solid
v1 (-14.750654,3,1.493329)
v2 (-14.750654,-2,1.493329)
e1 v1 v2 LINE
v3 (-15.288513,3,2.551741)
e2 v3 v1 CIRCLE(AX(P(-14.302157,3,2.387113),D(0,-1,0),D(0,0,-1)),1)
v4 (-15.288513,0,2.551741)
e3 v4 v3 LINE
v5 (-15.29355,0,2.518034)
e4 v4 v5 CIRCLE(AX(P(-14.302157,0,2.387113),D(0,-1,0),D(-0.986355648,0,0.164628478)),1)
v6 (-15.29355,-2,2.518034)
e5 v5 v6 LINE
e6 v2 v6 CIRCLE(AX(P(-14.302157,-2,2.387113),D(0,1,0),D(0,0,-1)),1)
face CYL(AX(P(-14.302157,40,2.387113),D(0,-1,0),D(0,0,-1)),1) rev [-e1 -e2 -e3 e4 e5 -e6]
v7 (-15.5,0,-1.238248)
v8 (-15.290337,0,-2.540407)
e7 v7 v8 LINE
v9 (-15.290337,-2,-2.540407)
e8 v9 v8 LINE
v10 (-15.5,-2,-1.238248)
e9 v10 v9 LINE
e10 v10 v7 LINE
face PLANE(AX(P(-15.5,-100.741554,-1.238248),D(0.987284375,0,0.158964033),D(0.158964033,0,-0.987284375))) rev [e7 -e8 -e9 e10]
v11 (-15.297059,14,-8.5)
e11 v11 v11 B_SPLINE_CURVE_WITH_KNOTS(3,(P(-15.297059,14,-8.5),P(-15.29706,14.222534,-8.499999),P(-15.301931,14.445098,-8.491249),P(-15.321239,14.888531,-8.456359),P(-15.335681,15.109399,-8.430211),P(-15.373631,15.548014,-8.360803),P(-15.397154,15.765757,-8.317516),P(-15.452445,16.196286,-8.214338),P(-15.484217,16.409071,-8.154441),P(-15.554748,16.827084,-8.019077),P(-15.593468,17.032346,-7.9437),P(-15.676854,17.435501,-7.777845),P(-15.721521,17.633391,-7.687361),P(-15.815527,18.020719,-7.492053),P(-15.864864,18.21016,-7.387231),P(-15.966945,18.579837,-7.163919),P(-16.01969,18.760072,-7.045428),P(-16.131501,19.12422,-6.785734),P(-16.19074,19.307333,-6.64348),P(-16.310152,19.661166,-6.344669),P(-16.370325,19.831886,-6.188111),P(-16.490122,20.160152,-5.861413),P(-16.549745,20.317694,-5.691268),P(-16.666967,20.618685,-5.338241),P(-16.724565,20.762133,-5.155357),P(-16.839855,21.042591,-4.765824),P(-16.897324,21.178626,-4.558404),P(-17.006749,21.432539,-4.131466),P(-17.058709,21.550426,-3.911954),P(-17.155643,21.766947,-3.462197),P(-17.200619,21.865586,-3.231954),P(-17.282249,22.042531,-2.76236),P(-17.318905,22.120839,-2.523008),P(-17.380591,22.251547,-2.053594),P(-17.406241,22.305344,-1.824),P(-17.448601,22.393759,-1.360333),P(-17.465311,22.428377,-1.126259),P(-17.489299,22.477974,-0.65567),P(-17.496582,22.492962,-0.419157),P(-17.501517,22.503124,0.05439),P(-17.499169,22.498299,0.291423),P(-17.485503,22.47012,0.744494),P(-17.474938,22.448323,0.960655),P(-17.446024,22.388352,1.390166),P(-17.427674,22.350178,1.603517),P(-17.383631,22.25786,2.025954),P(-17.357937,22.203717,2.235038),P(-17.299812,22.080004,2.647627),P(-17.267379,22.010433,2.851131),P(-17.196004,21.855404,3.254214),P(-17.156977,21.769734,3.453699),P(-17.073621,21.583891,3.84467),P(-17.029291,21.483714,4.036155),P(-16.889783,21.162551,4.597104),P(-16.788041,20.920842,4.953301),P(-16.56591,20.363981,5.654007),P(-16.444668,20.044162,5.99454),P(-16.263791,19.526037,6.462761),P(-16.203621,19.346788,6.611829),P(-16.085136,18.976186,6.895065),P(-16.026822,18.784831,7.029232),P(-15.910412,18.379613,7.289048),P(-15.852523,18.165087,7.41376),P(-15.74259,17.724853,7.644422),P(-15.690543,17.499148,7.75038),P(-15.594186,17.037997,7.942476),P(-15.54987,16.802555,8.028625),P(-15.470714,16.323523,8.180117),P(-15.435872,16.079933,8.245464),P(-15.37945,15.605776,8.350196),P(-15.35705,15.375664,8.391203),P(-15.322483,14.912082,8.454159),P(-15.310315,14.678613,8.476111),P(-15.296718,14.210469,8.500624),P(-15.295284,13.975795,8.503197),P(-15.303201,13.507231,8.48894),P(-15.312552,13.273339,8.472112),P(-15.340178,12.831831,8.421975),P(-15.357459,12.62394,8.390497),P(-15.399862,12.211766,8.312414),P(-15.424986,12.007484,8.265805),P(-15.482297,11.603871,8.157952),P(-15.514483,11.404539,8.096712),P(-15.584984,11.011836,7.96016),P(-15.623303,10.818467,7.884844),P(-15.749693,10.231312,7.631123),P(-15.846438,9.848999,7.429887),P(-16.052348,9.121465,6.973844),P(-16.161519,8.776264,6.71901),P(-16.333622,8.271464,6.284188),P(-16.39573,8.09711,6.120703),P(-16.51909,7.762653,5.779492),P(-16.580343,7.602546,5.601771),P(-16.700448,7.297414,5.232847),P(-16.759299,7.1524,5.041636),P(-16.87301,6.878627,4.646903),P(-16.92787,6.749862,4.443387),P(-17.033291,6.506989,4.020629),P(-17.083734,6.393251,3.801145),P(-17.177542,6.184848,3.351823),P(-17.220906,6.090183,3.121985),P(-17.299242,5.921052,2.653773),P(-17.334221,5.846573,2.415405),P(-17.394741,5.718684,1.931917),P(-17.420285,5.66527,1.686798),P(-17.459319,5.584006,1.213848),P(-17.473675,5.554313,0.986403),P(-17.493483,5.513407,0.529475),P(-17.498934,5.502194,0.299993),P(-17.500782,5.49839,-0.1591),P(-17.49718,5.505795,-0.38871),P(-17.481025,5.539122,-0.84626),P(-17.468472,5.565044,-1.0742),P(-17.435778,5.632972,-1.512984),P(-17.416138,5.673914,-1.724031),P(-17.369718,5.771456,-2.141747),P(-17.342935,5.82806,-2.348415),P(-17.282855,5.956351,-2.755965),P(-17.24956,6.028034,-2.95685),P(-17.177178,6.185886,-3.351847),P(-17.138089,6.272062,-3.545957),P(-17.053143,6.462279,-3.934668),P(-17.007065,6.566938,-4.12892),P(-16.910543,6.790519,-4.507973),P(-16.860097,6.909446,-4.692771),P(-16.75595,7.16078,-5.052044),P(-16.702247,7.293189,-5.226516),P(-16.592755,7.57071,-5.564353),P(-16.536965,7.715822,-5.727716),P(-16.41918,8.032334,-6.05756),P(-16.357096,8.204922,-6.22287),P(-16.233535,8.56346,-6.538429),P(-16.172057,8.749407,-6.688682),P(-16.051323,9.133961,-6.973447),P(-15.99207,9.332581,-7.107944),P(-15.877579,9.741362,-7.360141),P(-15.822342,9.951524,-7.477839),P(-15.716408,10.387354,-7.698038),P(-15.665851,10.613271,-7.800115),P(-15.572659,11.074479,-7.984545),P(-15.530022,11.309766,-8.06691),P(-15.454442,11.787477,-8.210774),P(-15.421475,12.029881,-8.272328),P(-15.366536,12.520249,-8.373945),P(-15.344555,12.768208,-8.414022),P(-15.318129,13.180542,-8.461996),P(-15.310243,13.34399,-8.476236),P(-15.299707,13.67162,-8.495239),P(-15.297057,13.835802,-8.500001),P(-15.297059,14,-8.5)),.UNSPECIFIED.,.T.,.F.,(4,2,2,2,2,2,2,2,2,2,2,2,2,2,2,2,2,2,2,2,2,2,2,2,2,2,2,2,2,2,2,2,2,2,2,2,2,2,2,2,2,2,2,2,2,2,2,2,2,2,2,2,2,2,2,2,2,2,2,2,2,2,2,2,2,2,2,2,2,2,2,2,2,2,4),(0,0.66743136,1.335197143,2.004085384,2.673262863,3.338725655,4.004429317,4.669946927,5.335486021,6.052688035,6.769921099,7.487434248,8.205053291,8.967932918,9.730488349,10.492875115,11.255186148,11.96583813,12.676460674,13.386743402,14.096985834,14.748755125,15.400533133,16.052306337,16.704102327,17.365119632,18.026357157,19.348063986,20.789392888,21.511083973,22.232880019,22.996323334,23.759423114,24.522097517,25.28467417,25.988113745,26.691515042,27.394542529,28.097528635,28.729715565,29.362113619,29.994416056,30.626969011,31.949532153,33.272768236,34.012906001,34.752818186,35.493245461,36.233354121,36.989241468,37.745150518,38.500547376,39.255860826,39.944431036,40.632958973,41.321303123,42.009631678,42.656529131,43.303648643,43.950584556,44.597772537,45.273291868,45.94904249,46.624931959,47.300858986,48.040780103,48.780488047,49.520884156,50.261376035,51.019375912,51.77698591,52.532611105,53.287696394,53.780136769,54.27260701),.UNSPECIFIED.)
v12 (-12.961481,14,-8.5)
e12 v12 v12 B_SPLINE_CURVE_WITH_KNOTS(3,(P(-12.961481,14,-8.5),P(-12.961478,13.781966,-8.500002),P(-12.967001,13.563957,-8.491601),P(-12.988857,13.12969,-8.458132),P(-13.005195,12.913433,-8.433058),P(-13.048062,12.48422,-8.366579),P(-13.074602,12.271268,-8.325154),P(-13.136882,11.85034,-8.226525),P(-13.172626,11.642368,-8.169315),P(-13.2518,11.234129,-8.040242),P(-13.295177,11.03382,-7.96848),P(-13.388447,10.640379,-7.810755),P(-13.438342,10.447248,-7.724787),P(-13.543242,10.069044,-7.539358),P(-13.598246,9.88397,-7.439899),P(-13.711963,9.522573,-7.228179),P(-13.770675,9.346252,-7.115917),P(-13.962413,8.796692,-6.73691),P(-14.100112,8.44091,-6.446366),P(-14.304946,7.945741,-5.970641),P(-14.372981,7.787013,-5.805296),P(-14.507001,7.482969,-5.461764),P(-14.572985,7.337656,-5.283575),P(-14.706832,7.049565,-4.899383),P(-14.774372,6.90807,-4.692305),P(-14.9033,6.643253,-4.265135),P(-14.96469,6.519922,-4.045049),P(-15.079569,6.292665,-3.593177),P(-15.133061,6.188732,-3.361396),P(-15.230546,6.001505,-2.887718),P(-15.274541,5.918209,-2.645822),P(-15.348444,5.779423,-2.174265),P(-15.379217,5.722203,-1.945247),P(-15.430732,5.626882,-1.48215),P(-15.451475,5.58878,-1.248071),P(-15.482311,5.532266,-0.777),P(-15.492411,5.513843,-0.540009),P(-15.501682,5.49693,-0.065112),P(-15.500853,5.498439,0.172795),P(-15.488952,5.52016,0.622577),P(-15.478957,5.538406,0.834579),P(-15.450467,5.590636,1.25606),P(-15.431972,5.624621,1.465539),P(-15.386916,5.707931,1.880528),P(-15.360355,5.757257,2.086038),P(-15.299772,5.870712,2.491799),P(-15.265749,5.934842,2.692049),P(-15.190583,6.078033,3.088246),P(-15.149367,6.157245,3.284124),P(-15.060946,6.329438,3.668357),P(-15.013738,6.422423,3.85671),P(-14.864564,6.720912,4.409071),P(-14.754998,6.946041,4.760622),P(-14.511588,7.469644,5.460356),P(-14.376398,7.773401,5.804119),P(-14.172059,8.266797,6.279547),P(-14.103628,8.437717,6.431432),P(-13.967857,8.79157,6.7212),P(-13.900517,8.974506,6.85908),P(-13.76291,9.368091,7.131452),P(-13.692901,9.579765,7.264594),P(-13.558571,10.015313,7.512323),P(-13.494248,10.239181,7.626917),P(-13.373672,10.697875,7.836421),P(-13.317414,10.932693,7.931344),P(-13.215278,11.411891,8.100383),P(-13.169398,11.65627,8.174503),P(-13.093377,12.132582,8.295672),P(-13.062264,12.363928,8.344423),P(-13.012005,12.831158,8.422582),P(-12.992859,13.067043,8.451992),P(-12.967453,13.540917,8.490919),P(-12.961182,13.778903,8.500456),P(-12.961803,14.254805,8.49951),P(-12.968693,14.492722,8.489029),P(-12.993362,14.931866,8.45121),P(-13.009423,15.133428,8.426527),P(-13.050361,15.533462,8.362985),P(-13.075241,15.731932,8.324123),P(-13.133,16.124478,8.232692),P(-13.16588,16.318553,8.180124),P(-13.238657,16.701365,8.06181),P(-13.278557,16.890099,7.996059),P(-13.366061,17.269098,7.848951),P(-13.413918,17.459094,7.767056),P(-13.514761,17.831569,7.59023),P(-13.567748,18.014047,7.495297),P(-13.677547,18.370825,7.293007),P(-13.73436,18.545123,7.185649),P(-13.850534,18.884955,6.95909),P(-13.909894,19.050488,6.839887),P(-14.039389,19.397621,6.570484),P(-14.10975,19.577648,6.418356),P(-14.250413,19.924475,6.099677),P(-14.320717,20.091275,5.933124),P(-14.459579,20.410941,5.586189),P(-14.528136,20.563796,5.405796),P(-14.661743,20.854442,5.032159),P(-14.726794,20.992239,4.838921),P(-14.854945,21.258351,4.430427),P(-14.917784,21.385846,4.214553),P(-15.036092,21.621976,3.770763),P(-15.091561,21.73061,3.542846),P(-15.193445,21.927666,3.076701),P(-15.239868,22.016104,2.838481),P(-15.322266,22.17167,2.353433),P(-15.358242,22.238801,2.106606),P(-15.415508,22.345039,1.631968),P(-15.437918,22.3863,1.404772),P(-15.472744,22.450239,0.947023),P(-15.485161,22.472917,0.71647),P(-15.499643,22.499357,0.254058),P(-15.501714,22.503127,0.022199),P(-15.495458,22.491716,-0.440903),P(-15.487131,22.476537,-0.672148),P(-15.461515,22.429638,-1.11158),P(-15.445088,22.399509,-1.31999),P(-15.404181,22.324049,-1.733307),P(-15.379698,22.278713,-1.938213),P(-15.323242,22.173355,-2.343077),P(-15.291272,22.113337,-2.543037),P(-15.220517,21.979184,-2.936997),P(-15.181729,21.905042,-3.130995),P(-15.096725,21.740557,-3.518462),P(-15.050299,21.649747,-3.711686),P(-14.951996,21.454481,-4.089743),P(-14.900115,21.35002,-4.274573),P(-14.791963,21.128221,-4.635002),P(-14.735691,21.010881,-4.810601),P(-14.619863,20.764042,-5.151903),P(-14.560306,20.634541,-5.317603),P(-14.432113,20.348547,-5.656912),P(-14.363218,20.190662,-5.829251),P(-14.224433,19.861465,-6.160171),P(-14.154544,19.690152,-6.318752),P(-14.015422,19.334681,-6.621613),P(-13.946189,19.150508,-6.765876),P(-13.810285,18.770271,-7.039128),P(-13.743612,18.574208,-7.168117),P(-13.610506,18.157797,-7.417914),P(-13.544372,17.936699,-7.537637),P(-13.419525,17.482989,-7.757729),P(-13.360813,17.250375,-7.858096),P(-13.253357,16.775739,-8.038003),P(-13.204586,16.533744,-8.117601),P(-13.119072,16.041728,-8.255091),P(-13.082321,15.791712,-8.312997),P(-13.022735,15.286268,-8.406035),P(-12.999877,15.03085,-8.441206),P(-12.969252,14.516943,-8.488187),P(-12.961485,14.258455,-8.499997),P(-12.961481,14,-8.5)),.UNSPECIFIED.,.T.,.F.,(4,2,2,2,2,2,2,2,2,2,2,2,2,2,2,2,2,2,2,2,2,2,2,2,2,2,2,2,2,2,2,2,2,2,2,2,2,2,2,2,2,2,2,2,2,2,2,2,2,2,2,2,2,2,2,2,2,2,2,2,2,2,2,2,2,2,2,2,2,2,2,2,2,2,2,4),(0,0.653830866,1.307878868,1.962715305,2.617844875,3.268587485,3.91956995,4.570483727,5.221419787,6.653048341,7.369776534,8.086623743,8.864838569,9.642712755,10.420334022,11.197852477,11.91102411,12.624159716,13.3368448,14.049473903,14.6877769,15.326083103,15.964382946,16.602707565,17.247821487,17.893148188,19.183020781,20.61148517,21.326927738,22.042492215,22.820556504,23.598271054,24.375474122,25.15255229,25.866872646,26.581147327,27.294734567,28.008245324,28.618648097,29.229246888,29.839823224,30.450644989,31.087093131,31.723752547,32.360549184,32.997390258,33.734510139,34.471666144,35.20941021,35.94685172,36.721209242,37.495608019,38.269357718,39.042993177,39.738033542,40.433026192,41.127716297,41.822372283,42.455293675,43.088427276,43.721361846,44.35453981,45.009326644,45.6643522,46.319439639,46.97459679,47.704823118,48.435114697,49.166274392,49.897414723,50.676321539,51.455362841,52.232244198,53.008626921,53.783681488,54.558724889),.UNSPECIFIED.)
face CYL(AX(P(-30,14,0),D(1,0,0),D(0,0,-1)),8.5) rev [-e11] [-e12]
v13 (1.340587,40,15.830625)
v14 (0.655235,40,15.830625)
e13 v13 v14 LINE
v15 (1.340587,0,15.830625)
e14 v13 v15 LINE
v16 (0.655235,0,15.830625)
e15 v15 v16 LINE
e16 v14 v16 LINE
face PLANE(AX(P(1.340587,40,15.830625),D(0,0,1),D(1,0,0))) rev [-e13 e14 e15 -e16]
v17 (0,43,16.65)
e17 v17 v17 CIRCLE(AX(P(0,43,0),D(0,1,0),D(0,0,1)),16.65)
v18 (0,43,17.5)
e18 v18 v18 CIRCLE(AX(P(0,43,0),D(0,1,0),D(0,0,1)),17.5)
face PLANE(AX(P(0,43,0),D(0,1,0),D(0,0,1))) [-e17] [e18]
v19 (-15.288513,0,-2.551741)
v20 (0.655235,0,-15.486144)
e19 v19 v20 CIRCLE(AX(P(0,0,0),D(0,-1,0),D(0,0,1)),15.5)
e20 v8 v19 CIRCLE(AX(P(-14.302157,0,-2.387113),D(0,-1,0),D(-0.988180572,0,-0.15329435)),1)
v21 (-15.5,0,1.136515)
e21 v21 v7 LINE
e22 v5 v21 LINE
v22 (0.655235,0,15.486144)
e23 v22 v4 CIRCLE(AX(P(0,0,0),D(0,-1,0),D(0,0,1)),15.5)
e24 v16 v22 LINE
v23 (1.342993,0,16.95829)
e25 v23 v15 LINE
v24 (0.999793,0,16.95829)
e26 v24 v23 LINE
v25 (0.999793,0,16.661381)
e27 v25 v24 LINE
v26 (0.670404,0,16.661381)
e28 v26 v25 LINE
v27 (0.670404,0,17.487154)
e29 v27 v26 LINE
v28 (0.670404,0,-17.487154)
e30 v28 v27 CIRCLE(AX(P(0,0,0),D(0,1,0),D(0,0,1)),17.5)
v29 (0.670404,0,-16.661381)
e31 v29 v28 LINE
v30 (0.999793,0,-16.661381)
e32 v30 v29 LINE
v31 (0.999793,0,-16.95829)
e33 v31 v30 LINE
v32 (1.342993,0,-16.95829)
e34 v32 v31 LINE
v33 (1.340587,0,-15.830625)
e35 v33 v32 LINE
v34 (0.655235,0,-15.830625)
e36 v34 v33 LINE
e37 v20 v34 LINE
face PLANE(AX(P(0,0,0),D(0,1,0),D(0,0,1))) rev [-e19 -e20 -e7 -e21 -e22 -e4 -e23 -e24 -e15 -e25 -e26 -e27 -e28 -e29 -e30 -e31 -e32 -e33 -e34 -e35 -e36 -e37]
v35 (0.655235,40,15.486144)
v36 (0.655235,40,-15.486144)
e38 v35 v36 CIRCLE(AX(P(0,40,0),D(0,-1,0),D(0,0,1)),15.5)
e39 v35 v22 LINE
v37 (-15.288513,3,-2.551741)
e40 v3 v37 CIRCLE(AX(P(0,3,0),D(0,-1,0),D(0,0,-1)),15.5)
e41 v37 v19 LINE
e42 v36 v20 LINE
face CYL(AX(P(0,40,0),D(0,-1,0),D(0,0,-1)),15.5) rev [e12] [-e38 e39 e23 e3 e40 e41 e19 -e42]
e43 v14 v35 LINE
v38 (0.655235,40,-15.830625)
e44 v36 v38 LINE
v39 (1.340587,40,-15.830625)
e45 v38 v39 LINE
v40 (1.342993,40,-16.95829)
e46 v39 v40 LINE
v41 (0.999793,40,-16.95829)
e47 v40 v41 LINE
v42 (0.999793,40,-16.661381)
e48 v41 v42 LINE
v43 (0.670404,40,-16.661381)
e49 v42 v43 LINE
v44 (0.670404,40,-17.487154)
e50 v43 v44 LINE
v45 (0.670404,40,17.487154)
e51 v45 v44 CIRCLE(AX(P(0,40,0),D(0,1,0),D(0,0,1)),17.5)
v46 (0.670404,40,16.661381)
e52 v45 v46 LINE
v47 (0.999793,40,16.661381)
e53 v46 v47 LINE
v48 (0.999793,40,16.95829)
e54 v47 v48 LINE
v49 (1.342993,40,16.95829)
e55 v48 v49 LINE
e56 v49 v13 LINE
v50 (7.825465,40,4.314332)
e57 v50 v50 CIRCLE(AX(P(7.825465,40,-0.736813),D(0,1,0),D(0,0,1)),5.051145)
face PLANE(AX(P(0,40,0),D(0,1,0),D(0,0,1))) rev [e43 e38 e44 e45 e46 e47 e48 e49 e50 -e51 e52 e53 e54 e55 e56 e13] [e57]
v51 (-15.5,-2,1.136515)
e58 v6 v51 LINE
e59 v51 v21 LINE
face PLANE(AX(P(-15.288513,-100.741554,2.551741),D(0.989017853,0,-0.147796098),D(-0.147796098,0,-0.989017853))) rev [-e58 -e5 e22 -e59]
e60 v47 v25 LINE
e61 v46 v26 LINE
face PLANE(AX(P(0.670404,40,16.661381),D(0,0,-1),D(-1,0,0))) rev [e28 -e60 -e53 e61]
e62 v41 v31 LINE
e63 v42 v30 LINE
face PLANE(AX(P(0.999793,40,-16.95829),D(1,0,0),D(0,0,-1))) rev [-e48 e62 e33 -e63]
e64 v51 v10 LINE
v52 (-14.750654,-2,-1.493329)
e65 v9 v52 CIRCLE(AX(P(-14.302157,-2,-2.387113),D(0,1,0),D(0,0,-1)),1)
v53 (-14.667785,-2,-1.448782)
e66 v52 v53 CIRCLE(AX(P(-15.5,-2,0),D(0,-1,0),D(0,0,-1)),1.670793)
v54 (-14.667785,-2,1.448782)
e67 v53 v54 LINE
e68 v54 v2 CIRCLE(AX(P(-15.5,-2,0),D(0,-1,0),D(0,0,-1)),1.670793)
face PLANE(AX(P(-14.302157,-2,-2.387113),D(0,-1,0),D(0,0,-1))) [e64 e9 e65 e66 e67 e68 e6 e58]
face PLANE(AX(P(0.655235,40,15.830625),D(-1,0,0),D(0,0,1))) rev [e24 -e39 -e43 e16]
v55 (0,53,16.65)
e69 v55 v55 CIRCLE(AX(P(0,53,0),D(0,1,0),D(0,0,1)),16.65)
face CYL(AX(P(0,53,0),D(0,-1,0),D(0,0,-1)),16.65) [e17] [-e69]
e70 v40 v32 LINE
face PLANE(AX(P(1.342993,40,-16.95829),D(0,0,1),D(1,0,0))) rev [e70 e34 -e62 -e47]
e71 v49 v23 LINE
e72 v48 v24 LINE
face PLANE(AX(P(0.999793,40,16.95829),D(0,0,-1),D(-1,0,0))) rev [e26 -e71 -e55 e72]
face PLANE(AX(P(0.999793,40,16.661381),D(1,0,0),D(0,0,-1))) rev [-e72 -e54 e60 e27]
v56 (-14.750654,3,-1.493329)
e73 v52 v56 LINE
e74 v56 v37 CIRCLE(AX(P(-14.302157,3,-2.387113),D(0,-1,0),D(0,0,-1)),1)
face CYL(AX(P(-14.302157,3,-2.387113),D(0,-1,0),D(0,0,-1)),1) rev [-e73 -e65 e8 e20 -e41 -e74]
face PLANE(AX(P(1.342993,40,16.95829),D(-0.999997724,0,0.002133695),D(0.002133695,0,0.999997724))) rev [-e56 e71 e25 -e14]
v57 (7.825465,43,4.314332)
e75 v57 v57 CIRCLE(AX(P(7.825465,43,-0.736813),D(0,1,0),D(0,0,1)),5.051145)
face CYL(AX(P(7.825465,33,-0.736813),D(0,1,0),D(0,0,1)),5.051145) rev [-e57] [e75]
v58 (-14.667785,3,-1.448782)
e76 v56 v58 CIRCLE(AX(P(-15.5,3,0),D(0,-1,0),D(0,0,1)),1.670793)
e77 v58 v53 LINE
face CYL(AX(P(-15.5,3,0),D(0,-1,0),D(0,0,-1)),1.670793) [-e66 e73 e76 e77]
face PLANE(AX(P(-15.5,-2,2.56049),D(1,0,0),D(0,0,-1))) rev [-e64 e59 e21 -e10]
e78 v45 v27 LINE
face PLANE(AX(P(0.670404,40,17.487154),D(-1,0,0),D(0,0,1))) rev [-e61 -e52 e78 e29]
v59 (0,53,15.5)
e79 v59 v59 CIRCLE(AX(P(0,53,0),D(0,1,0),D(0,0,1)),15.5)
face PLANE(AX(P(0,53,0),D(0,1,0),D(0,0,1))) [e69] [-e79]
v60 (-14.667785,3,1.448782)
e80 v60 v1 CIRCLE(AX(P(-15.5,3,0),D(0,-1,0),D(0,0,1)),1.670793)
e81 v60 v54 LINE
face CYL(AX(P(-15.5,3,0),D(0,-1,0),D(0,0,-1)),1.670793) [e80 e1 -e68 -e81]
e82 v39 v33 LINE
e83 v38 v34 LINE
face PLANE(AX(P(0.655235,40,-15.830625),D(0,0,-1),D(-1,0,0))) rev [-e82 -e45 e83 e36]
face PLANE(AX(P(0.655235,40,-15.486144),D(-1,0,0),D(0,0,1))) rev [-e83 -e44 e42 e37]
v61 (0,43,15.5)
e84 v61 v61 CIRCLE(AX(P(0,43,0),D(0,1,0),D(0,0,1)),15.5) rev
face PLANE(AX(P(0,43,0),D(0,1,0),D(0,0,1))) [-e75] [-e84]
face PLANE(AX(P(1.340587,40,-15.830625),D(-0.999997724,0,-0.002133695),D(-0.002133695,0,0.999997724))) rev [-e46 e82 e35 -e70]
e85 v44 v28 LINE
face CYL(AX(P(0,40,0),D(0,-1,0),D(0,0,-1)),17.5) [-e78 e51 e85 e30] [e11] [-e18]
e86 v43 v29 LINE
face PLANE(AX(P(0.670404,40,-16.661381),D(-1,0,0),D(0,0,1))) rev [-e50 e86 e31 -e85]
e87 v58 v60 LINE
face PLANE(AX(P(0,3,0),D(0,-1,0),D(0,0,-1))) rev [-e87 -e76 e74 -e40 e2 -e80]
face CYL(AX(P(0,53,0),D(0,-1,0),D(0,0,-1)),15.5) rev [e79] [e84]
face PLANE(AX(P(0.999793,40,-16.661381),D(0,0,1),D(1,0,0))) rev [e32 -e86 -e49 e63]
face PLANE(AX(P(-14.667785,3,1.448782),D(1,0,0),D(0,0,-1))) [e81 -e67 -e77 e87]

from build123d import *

# Parameters (mm, degrees)
BOSS_EXTRUDE1_DEPTH = 40
SKETCH16_R          = 17.5
BOSS_EXTRUDE2_DEPTH = 3
SKETCH17_R          = 16.65
SKETCH17_R_2        = 15.5
BOSS_EXTRUDE3_DEPTH = 10
SKETCH18_R          = 8.5
CUT_EXTRUDE1_DEPTH  = 30
BOSS_EXTRUDE4_DEPTH = 3
FILLET1_R           = 1
FILLET3_R           = 1
BOSS_EXTRUDE5_START = 2
BOSS_EXTRUDE5_DEPTH = 2
CUT_EXTRUDE3_START  = -2
CUT_EXTRUDE3_DEPTH  = 2
SKETCH28_R          = 5.051145337
CUT_EXTRUDE4_DEPTH  = 10


# Read off the part's stored shape, not the designer's step: Cut-Extrude3
with BuildPart() as part:
    # Sketch13 → Boss-Extrude1 (new body)
    with BuildSketch(Plane(origin=(0, 0, 0), x_dir=(1, 0, 0), z_dir=(0, 1, 0))):
        with BuildLine():
            Line((0.65523527, 15.486144347), (0.65523527, 15.830625123))
            Line((0.65523527, 15.830625123), (1.340586782, 15.830625123))
            Line((1.340586782, 15.830625123), (1.342992881, 16.95829018))
            Line((1.342992881, 16.95829018), (0.999793375, 16.95829018))
            Line((0.999793375, 16.95829018), (0.999793375, 16.661380915))
            Line((0.999793375, 16.661380915), (0.670404475, 16.661380915))
            Line((0.670404475, 16.661380915), (0.670404475, 17.487154081))
            ThreePointArc((0.670404475, 17.487154081), (-17.5, 0), (0.670404475, -17.487154081))
            Line((0.670404475, -17.487154081), (0.670404475, -16.661380915))
            Line((0.670404475, -16.661380915), (0.999793375, -16.661380915))
            Line((0.999793375, -16.661380915), (0.999793375, -16.95829018))
            Line((0.999793375, -16.95829018), (1.342992881, -16.95829018))
            Line((1.342992881, -16.95829018), (1.340586782, -15.830625123))
            Line((1.340586782, -15.830625123), (0.65523527, -15.830625123))
            Line((0.65523527, -15.830625123), (0.65523527, -15.486144347))
            ThreePointArc((0.65523527, -15.486144347), (-15.5, 0), (0.65523527, 15.486144347))
        make_face()
    extrude(amount=BOSS_EXTRUDE1_DEPTH)

    # Sketch16 → Boss-Extrude2 (add)
    with BuildSketch(Plane(origin=(0, 40, 0), x_dir=(1, 0, 0), z_dir=(0, 1, 0))):
        with Locations(Location((0, 0, 0), (0, 0, 87.804528663))):
            Circle(SKETCH16_R)
    extrude(amount=BOSS_EXTRUDE2_DEPTH)

    # Sketch17 → Boss-Extrude3 (add)
    with BuildSketch(Plane(origin=(0, 43, 0), x_dir=(1, 0, 0), z_dir=(0, 1, 0))):
        with Locations(Location((0, 0, 0), (0, 0, 270))):
            Circle(SKETCH17_R)
        with Locations(Location((0, 0, 0), (0, 0, 270))):
            Circle(SKETCH17_R_2, mode=Mode.SUBTRACT)
    extrude(amount=BOSS_EXTRUDE3_DEPTH)

    # Sketch18 → Cut-Extrude1 (cut)
    with BuildSketch(Plane(origin=(0, 0, 0), x_dir=(0, 0, -1), z_dir=(1, 0, 0))):
        with Locations((0, 14)):
            Circle(SKETCH18_R)
    extrude(amount=-CUT_EXTRUDE1_DEPTH, mode=Mode.SUBTRACT)

    # Sketch20 → Boss-Extrude4 (add)
    with BuildSketch(Plane.XZ):
        with BuildLine():
            Line((-14.667785333, 1.448781774), (-14.667785333, -1.448781774))
            ThreePointArc((-14.667785333, -1.448781774), (-15.025977642, -1.602140032), (-15.409950004, -1.668364732))
            ThreePointArc((-15.409950004, -1.668364732), (-15.5, 0), (-15.409950004, 1.668364732))
            ThreePointArc((-15.409950004, 1.668364732), (-15.025977642, 1.602140032), (-14.667785333, 1.448781774))
        make_face()
    extrude(amount=-BOSS_EXTRUDE4_DEPTH)

    # Fillet1
    fillet1_edges = [part.edges().sort_by_distance(p)[0] for p in [
        (-15.409950004, 1.5, 1.668364732),
    ]]
    fillet(fillet1_edges, radius=FILLET1_R)

    # Fillet3
    fillet3_edges = [part.edges().sort_by_distance(p)[0] for p in [
        (-15.409950004, 1.5, -1.668364732),
    ]]
    fillet(fillet3_edges, radius=FILLET3_R)

    # Sketch25 → Boss-Extrude5 (add)
    with BuildSketch(Plane.XZ.offset(BOSS_EXTRUDE5_START)):
        with BuildLine():
            Line((-15.5, 2.560490416), (-15.5, -2.560490416))
            ThreePointArc((-15.5, -2.560490416), (-15.394165826, -2.55830223), (-15.288512543, -2.551741411))
            ThreePointArc((-15.288512543, -2.551741411), (-15.193650033, -1.934078734), (-14.750654034, -1.493328665))
            ThreePointArc((-14.750654034, -1.493328665), (-14.708906064, -1.471638632), (-14.667785333, -1.448781774))
            Line((-14.667785333, -1.448781774), (-14.667785333, 1.448781774))
            ThreePointArc((-14.667785333, 1.448781774), (-14.708906064, 1.471638632), (-14.750654034, 1.493328665))
            ThreePointArc((-14.750654034, 1.493328665), (-15.193650033, 1.934078734), (-15.288512543, 2.551741411))
            ThreePointArc((-15.288512543, 2.551741411), (-15.394165826, 2.55830223), (-15.5, 2.560490416))
        make_face()
    extrude(amount=-BOSS_EXTRUDE5_DEPTH)

    # Cut-Extrude3 outline → Cut-Extrude3 (cut)
    with BuildSketch(Plane.XZ.offset(2).offset(CUT_EXTRUDE3_START)):
        with BuildLine():
            ThreePointArc((-15.288512543, -2.551741411), (-15.28944127, -2.546076966), (-15.290337467, -2.540407283))
            Line((-15.290337467, -2.540407283), (-15.5, -1.238247673))
            Line((-15.5, -1.238247673), (-15.5, -2.560490416))
            ThreePointArc((-15.5, -2.560490416), (-15.394165826, -2.55830223), (-15.288512543, -2.551741411))
        make_face()
        with BuildLine():
            Line((-15.5, 2.560490416), (-15.5, 1.136515472))
            Line((-15.5, 1.136515472), (-15.293549726, 2.518033727))
            ThreePointArc((-15.293549726, 2.518033727), (-15.291174748, 2.53490903), (-15.288512543, 2.551741411))
            ThreePointArc((-15.288512543, 2.551741411), (-15.394165826, 2.55830223), (-15.5, 2.560490416))
        make_face()
    extrude(amount=CUT_EXTRUDE3_DEPTH, mode=Mode.SUBTRACT)

    # Sketch28 → Cut-Extrude4 (cut)
    with BuildSketch(Plane(origin=(0, 43, 0), x_dir=(1, 0, 0), z_dir=(0, 1, 0))):
        with Locations(Location((7.825464684, 0.736813233, 0), (0, 0, 270))):
            Circle(SKETCH28_R)
    extrude(amount=-CUT_EXTRUDE4_DEPTH, mode=Mode.SUBTRACT)


solid = part.part
